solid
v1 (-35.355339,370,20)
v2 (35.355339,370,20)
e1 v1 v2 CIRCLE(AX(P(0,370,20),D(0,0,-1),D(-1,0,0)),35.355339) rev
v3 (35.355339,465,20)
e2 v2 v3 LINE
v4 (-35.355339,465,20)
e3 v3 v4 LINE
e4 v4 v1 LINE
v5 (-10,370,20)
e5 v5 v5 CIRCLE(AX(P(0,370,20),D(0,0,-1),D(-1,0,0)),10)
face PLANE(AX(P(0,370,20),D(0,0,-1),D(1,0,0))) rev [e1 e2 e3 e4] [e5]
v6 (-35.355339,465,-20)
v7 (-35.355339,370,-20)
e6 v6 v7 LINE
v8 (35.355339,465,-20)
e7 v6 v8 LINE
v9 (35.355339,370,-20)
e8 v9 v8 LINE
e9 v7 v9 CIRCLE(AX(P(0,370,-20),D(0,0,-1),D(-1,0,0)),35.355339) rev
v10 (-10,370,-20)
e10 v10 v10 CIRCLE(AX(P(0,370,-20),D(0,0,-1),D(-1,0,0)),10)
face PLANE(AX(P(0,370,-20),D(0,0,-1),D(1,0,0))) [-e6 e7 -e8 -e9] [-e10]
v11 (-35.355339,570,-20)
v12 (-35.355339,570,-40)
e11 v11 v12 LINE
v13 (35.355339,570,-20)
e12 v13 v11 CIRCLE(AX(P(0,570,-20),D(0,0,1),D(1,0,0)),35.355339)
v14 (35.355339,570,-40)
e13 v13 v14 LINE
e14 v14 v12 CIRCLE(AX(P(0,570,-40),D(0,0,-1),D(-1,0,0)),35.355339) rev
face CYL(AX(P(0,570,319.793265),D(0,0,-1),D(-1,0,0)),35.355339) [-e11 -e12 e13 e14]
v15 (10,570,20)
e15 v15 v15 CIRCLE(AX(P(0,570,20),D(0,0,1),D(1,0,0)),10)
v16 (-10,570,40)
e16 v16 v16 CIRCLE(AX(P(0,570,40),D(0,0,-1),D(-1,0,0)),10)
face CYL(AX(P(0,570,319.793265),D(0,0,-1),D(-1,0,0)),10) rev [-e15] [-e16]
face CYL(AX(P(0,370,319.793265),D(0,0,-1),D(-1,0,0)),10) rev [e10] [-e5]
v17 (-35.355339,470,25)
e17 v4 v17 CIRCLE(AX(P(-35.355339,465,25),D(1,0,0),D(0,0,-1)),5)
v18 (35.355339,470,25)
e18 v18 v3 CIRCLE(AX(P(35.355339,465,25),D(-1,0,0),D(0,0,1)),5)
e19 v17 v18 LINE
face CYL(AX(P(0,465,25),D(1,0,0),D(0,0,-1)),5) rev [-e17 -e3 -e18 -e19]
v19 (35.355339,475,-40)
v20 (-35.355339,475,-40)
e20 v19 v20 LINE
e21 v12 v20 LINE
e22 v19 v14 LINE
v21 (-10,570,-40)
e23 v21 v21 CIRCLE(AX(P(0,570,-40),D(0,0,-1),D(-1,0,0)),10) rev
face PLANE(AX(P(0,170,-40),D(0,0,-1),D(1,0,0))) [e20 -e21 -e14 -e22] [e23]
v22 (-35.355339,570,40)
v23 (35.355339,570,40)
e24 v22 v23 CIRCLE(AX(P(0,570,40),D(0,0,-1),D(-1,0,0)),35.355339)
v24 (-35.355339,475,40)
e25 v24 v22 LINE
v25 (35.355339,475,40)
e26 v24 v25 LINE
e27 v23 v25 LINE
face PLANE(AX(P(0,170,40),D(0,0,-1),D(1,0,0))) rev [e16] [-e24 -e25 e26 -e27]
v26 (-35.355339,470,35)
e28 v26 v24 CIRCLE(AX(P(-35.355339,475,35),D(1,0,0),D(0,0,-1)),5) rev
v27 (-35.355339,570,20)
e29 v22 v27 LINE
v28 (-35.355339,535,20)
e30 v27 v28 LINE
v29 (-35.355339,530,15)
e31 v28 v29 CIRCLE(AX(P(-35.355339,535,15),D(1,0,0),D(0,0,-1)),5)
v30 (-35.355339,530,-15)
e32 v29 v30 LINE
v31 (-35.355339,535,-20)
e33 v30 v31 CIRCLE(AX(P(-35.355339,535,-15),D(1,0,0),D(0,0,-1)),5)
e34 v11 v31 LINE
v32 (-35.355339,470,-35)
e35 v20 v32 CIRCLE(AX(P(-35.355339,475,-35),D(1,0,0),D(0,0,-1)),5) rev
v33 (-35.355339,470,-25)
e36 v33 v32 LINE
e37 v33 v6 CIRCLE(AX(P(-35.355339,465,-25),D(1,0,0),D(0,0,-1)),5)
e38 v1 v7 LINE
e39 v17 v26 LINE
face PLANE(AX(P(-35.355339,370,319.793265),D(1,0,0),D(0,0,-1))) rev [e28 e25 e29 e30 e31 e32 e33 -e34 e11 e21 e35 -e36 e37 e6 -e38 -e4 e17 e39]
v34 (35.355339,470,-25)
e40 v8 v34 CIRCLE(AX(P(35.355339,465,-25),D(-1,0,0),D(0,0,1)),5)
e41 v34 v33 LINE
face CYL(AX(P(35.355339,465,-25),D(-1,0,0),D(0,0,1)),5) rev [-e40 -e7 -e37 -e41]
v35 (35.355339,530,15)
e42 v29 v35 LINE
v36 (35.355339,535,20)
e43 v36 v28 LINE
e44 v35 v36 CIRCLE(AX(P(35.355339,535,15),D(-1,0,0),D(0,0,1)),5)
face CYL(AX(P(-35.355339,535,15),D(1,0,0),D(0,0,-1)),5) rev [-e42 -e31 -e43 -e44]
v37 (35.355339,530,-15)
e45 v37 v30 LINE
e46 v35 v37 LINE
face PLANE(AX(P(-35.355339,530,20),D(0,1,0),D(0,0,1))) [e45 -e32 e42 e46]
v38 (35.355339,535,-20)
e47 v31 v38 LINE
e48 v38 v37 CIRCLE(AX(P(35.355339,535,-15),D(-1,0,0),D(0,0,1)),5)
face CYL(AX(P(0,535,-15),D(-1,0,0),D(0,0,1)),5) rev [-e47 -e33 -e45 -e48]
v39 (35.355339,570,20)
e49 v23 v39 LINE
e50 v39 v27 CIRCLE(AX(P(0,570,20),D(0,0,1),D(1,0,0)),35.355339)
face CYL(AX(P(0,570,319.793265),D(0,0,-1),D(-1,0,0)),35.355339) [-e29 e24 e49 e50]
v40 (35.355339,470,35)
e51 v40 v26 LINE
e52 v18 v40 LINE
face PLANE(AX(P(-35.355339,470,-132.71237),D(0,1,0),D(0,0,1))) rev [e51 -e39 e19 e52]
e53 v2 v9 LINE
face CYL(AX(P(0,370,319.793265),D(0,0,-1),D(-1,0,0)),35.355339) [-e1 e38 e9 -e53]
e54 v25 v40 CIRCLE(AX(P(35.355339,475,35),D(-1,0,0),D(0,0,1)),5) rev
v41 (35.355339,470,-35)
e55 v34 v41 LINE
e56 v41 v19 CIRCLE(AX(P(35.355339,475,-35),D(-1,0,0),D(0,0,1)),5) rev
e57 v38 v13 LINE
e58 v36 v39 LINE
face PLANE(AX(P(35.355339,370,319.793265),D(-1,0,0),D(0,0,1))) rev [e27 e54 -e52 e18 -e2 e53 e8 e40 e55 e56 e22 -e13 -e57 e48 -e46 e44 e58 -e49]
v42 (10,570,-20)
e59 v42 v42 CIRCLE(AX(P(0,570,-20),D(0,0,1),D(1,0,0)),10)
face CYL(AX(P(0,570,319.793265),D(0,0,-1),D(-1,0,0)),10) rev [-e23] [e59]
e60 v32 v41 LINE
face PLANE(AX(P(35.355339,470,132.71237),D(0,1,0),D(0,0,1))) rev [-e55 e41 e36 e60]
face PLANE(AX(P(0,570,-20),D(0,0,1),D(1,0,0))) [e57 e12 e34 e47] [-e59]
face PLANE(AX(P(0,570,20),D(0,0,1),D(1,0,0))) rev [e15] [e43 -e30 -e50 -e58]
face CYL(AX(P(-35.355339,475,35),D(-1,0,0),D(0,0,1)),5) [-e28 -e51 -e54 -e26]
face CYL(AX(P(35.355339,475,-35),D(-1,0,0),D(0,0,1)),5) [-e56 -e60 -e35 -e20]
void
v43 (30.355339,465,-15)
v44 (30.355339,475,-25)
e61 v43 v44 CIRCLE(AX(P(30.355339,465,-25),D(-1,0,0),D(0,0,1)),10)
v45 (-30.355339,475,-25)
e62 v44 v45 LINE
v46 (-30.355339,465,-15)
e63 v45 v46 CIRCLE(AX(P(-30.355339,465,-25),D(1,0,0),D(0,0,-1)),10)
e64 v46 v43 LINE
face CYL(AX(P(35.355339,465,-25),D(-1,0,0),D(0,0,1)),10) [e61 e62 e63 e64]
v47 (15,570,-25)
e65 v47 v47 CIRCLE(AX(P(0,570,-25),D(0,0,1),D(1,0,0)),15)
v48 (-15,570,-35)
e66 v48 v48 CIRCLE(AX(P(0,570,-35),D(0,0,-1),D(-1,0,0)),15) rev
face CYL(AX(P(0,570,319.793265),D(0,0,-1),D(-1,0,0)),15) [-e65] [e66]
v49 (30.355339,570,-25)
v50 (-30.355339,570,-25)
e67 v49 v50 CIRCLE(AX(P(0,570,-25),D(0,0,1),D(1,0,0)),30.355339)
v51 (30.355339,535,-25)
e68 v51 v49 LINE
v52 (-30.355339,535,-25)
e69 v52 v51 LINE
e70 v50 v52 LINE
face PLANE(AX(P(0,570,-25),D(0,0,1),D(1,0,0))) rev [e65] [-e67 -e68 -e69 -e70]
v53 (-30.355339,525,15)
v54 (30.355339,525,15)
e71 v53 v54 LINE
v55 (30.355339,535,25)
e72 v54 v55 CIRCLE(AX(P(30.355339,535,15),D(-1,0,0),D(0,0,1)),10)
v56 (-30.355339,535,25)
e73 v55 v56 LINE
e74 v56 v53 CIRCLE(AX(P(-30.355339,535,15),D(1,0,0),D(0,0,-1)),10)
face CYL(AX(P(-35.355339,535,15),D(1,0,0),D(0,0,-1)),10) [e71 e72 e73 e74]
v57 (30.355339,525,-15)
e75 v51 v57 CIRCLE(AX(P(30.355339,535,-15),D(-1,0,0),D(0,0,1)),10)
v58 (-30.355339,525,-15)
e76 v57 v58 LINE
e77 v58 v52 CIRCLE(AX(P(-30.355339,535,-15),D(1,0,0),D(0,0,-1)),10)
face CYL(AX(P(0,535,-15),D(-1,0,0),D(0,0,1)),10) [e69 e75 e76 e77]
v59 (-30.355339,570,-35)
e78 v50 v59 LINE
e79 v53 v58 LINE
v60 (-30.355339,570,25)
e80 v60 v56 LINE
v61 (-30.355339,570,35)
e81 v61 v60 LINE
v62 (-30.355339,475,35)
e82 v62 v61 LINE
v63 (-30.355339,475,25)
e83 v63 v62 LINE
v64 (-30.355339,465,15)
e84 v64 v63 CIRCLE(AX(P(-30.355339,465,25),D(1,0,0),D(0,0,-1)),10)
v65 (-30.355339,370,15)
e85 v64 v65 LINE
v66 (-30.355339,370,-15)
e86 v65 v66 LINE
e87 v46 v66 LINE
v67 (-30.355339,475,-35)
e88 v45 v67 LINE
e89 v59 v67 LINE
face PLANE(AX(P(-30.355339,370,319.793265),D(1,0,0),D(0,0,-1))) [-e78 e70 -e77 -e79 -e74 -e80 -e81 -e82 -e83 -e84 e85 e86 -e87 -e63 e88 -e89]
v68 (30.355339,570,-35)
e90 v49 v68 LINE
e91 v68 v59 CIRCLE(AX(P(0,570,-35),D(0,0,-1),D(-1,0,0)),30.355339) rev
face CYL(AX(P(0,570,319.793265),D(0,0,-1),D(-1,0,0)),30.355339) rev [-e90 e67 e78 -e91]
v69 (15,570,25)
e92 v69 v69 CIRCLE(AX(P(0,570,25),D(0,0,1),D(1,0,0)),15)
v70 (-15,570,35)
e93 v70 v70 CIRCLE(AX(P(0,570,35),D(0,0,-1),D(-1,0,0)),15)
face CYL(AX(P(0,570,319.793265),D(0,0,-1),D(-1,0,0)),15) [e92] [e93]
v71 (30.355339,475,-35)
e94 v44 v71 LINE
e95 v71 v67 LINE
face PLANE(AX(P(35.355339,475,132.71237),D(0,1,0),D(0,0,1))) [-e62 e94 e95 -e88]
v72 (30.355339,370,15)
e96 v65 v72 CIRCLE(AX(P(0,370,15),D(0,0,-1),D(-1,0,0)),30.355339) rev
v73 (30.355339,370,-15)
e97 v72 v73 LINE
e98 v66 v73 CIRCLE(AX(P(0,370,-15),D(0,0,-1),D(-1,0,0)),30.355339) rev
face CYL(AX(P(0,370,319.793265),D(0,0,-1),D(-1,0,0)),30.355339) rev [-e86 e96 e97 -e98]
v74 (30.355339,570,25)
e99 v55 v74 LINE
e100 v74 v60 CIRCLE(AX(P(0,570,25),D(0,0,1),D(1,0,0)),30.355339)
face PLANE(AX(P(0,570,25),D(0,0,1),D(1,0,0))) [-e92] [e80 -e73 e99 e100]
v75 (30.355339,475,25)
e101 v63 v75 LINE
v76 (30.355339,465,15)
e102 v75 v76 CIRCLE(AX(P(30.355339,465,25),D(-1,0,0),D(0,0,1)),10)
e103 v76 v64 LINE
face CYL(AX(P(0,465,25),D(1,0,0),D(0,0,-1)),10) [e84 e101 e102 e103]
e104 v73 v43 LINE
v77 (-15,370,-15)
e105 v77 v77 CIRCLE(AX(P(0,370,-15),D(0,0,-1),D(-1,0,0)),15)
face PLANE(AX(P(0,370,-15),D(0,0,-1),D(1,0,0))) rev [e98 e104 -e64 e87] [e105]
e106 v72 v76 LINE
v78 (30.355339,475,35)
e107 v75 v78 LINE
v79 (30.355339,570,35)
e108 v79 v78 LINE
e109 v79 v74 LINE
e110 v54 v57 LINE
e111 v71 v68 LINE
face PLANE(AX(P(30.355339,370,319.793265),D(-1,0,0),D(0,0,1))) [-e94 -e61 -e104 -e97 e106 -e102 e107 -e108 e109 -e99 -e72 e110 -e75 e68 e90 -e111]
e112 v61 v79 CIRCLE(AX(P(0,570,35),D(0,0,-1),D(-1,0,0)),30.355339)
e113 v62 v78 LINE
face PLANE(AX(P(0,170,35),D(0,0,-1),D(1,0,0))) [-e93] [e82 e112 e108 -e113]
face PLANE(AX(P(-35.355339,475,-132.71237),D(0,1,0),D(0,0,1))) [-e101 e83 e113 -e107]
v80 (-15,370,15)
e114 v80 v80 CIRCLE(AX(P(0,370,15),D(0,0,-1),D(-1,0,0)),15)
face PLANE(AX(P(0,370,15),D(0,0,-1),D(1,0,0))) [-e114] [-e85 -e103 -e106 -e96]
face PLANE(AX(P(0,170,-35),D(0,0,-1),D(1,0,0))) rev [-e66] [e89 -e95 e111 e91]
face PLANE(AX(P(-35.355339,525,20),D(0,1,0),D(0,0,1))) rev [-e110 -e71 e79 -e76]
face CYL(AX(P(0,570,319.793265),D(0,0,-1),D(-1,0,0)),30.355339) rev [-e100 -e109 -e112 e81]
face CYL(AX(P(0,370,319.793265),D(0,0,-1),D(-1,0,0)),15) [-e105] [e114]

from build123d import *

# Parameters (mm, degrees)
BOSS_EXTRUDE1_DEPTH      = 40
BOSS_EXTRUDE1_DEPTH_BACK = 40
SKETCH1_R                = 10
CUT_EXTRUDE2_DEPTH       = 20
CUT_EXTRUDE2_DEPTH_BACK  = 20
CUT_EXTRUDE4_START       = -20
CUT_EXTRUDE4_DEPTH       = 20
CUT_EXTRUDE6_START       = -20
CUT_EXTRUDE6_DEPTH       = 20
FILLET3_R                = 5
SHELL1_START             = -15
SHELL1_OUTLINE_R         = 15
SHELL1_DEPTH             = 30
SHELL1_START_2           = -35
SHELL1_2_OUTLINE_W       = 60.710678118
SHELL1_2_OUTLINE_H       = 50
SHELL1_2_DEPTH           = 70
SHELL1_3_OUTLINE_R       = 15
SHELL1_3_DEPTH           = 10
SHELL1_START_3           = 25
SHELL1_4_OUTLINE_R       = 15
SHELL1_4_DEPTH           = 10
SHELL1_START_4           = -30.355339059
SHELL1_5_DEPTH           = 60.710678118


with BuildPart() as part:
    # Sketch1 → Boss-Extrude1 (new, two sides: drawn at the far end of the back side and taken through both)
    with BuildSketch(Plane.XY.offset(-BOSS_EXTRUDE1_DEPTH_BACK)):
        with BuildLine():
            Line((-35.355339059, 370), (-35.355339059, 570))
            ThreePointArc((-35.355339059, 570), (0, 605.355339059), (35.355339059, 570))
            Line((35.355339059, 570), (35.355339059, 370))
            ThreePointArc((35.355339059, 370), (0, 334.644660941), (-35.355339059, 370))
        make_face()
        with Locations(Location((0, 370, 0), (0, 0, 180))):
            Circle(SKETCH1_R, mode=Mode.SUBTRACT)
        with Locations(Location((0, 570, 0), (0, 0, 180))):
            Circle(SKETCH1_R, mode=Mode.SUBTRACT)
    extrude(amount=BOSS_EXTRUDE1_DEPTH + BOSS_EXTRUDE1_DEPTH_BACK)

    # Sketch2 → Cut-Extrude2 (cut, two sides: drawn at the far end of the back side and taken through both)
    with BuildSketch(Plane.XY.offset(-CUT_EXTRUDE2_DEPTH_BACK)):
        with BuildLine():
            Line((-35.355339059, 530), (35.355339059, 530))
            Line((35.355339059, 530), (35.355339059, 570))
            ThreePointArc((35.355339059, 570), (0, 605.355339059), (-35.355339059, 570))
            Line((-35.355339059, 570), (-35.355339059, 530))
        make_face()
    extrude(amount=CUT_EXTRUDE2_DEPTH + CUT_EXTRUDE2_DEPTH_BACK, mode=Mode.SUBTRACT)

    # Sketch3 → Cut-Extrude4 (cut)
    with BuildSketch(Plane.XY.offset(40).offset(CUT_EXTRUDE4_START)):
        with BuildLine():
            Line((-35.355339059, 370), (-35.355339059, 470))
            Line((-35.355339059, 470), (35.355339059, 470))
            Line((35.355339059, 470), (35.355339059, 370))
            ThreePointArc((35.355339059, 370), (0, 334.644660941), (-35.355339059, 370))
        make_face()
    extrude(amount=CUT_EXTRUDE4_DEPTH, mode=Mode.SUBTRACT)

    # Sketch5 → Cut-Extrude6 (cut)
    with BuildSketch(Plane(origin=(0, 0, -40), x_dir=(-1, 0, 0), z_dir=(0, 0, -1)).offset(CUT_EXTRUDE6_START)):
        with BuildLine():
            Line((-35.355339059, 370), (-35.355339059, 470))
            Line((-35.355339059, 470), (35.355339059, 470))
            Line((35.355339059, 470), (35.355339059, 370))
            ThreePointArc((35.355339059, 370), (0, 334.644660941), (-35.355339059, 370))
        make_face()
    extrude(amount=CUT_EXTRUDE6_DEPTH, mode=Mode.SUBTRACT)

    # Fillet3
    fillet3_edges = [part.edges().sort_by_distance(p)[0] for p in [
        (0, 530, -20),
        (0, 530, 20),
        (0, 470, 40),
        (0, 470, 20),
        (0, 470, -40),
        (0, 470, -20),
    ]]
    fillet(fillet3_edges, radius=FILLET3_R)

    # Shell1: read off the stored shape, not the designer's step
    # Shell1 outline → Shell1 (cut)
    with BuildSketch(Plane.XY.offset(SHELL1_START)):
        with BuildLine():
            ThreePointArc((-30.355339059, 370), (0, 339.644660941), (30.355339059, 370))
            Line((30.355339059, 370), (30.355339059, 525))
            Line((30.355339059, 525), (-30.355339059, 525))
            Line((-30.355339059, 525), (-30.355339059, 370))
        make_face()
        with Locations((0, 370)):
            Circle(SHELL1_OUTLINE_R, mode=Mode.SUBTRACT)
    extrude(amount=SHELL1_DEPTH, mode=Mode.SUBTRACT)

    # Shell1 2 outline → Shell1 2 (cut)
    with BuildSketch(Plane.XY.offset(SHELL1_START_2)):
        with Locations((0, 500)):
            Rectangle(SHELL1_2_OUTLINE_W, SHELL1_2_OUTLINE_H)
    extrude(amount=SHELL1_2_DEPTH, mode=Mode.SUBTRACT)

    # Shell1 3 outline → Shell1 3 (cut)
    with BuildSketch(Plane.XY.offset(SHELL1_START_2)):
        with BuildLine():
            Line((-30.355339059, 525), (30.355339059, 525))
            Line((30.355339059, 525), (30.355339059, 570))
            ThreePointArc((30.355339059, 570), (0, 600.355339059), (-30.355339059, 570))
            Line((-30.355339059, 570), (-30.355339059, 525))
        make_face()
        with Locations((0, 570)):
            Circle(SHELL1_3_OUTLINE_R, mode=Mode.SUBTRACT)
    extrude(amount=SHELL1_3_DEPTH, mode=Mode.SUBTRACT)

    # Shell1 4 outline → Shell1 4 (cut)
    with BuildSketch(Plane.XY.offset(SHELL1_START_3)):
        with BuildLine():
            Line((-30.355339059, 525), (30.355339059, 525))
            Line((30.355339059, 525), (30.355339059, 570))
            ThreePointArc((30.355339059, 570), (0, 600.355339059), (-30.355339059, 570))
            Line((-30.355339059, 570), (-30.355339059, 525))
        make_face()
        with Locations((0, 570)):
            Circle(SHELL1_4_OUTLINE_R, mode=Mode.SUBTRACT)
    extrude(amount=SHELL1_4_DEPTH, mode=Mode.SUBTRACT)

    # Shell1 5 outline → Shell1 5 (cut)
    with BuildSketch(Plane.YZ.offset(SHELL1_START_4)):
        with BuildLine():
            ThreePointArc((535, -25), (527.928932188, -22.071067812), (525, -15))
            Line((525, -15), (525, -25))
            Line((525, -25), (535, -25))
        make_face()
        with BuildLine():
            ThreePointArc((525, 15), (527.928932188, 22.071067812), (535, 25))
            Line((535, 25), (525, 25))
            Line((525, 25), (525, 15))
        make_face()
        with BuildLine():
            ThreePointArc((475, 25), (472.071067812, 17.928932188), (465, 15))
            Line((465, 15), (475, 15))
            Line((475, 15), (475, 25))
        make_face()
        with BuildLine():
            Line((475, -15), (465, -15))
            ThreePointArc((465, -15), (472.071067812, -17.928932188), (475, -25))
            Line((475, -25), (475, -15))
        make_face()
    extrude(amount=SHELL1_5_DEPTH, mode=Mode.SUBTRACT)


solid = part.part
